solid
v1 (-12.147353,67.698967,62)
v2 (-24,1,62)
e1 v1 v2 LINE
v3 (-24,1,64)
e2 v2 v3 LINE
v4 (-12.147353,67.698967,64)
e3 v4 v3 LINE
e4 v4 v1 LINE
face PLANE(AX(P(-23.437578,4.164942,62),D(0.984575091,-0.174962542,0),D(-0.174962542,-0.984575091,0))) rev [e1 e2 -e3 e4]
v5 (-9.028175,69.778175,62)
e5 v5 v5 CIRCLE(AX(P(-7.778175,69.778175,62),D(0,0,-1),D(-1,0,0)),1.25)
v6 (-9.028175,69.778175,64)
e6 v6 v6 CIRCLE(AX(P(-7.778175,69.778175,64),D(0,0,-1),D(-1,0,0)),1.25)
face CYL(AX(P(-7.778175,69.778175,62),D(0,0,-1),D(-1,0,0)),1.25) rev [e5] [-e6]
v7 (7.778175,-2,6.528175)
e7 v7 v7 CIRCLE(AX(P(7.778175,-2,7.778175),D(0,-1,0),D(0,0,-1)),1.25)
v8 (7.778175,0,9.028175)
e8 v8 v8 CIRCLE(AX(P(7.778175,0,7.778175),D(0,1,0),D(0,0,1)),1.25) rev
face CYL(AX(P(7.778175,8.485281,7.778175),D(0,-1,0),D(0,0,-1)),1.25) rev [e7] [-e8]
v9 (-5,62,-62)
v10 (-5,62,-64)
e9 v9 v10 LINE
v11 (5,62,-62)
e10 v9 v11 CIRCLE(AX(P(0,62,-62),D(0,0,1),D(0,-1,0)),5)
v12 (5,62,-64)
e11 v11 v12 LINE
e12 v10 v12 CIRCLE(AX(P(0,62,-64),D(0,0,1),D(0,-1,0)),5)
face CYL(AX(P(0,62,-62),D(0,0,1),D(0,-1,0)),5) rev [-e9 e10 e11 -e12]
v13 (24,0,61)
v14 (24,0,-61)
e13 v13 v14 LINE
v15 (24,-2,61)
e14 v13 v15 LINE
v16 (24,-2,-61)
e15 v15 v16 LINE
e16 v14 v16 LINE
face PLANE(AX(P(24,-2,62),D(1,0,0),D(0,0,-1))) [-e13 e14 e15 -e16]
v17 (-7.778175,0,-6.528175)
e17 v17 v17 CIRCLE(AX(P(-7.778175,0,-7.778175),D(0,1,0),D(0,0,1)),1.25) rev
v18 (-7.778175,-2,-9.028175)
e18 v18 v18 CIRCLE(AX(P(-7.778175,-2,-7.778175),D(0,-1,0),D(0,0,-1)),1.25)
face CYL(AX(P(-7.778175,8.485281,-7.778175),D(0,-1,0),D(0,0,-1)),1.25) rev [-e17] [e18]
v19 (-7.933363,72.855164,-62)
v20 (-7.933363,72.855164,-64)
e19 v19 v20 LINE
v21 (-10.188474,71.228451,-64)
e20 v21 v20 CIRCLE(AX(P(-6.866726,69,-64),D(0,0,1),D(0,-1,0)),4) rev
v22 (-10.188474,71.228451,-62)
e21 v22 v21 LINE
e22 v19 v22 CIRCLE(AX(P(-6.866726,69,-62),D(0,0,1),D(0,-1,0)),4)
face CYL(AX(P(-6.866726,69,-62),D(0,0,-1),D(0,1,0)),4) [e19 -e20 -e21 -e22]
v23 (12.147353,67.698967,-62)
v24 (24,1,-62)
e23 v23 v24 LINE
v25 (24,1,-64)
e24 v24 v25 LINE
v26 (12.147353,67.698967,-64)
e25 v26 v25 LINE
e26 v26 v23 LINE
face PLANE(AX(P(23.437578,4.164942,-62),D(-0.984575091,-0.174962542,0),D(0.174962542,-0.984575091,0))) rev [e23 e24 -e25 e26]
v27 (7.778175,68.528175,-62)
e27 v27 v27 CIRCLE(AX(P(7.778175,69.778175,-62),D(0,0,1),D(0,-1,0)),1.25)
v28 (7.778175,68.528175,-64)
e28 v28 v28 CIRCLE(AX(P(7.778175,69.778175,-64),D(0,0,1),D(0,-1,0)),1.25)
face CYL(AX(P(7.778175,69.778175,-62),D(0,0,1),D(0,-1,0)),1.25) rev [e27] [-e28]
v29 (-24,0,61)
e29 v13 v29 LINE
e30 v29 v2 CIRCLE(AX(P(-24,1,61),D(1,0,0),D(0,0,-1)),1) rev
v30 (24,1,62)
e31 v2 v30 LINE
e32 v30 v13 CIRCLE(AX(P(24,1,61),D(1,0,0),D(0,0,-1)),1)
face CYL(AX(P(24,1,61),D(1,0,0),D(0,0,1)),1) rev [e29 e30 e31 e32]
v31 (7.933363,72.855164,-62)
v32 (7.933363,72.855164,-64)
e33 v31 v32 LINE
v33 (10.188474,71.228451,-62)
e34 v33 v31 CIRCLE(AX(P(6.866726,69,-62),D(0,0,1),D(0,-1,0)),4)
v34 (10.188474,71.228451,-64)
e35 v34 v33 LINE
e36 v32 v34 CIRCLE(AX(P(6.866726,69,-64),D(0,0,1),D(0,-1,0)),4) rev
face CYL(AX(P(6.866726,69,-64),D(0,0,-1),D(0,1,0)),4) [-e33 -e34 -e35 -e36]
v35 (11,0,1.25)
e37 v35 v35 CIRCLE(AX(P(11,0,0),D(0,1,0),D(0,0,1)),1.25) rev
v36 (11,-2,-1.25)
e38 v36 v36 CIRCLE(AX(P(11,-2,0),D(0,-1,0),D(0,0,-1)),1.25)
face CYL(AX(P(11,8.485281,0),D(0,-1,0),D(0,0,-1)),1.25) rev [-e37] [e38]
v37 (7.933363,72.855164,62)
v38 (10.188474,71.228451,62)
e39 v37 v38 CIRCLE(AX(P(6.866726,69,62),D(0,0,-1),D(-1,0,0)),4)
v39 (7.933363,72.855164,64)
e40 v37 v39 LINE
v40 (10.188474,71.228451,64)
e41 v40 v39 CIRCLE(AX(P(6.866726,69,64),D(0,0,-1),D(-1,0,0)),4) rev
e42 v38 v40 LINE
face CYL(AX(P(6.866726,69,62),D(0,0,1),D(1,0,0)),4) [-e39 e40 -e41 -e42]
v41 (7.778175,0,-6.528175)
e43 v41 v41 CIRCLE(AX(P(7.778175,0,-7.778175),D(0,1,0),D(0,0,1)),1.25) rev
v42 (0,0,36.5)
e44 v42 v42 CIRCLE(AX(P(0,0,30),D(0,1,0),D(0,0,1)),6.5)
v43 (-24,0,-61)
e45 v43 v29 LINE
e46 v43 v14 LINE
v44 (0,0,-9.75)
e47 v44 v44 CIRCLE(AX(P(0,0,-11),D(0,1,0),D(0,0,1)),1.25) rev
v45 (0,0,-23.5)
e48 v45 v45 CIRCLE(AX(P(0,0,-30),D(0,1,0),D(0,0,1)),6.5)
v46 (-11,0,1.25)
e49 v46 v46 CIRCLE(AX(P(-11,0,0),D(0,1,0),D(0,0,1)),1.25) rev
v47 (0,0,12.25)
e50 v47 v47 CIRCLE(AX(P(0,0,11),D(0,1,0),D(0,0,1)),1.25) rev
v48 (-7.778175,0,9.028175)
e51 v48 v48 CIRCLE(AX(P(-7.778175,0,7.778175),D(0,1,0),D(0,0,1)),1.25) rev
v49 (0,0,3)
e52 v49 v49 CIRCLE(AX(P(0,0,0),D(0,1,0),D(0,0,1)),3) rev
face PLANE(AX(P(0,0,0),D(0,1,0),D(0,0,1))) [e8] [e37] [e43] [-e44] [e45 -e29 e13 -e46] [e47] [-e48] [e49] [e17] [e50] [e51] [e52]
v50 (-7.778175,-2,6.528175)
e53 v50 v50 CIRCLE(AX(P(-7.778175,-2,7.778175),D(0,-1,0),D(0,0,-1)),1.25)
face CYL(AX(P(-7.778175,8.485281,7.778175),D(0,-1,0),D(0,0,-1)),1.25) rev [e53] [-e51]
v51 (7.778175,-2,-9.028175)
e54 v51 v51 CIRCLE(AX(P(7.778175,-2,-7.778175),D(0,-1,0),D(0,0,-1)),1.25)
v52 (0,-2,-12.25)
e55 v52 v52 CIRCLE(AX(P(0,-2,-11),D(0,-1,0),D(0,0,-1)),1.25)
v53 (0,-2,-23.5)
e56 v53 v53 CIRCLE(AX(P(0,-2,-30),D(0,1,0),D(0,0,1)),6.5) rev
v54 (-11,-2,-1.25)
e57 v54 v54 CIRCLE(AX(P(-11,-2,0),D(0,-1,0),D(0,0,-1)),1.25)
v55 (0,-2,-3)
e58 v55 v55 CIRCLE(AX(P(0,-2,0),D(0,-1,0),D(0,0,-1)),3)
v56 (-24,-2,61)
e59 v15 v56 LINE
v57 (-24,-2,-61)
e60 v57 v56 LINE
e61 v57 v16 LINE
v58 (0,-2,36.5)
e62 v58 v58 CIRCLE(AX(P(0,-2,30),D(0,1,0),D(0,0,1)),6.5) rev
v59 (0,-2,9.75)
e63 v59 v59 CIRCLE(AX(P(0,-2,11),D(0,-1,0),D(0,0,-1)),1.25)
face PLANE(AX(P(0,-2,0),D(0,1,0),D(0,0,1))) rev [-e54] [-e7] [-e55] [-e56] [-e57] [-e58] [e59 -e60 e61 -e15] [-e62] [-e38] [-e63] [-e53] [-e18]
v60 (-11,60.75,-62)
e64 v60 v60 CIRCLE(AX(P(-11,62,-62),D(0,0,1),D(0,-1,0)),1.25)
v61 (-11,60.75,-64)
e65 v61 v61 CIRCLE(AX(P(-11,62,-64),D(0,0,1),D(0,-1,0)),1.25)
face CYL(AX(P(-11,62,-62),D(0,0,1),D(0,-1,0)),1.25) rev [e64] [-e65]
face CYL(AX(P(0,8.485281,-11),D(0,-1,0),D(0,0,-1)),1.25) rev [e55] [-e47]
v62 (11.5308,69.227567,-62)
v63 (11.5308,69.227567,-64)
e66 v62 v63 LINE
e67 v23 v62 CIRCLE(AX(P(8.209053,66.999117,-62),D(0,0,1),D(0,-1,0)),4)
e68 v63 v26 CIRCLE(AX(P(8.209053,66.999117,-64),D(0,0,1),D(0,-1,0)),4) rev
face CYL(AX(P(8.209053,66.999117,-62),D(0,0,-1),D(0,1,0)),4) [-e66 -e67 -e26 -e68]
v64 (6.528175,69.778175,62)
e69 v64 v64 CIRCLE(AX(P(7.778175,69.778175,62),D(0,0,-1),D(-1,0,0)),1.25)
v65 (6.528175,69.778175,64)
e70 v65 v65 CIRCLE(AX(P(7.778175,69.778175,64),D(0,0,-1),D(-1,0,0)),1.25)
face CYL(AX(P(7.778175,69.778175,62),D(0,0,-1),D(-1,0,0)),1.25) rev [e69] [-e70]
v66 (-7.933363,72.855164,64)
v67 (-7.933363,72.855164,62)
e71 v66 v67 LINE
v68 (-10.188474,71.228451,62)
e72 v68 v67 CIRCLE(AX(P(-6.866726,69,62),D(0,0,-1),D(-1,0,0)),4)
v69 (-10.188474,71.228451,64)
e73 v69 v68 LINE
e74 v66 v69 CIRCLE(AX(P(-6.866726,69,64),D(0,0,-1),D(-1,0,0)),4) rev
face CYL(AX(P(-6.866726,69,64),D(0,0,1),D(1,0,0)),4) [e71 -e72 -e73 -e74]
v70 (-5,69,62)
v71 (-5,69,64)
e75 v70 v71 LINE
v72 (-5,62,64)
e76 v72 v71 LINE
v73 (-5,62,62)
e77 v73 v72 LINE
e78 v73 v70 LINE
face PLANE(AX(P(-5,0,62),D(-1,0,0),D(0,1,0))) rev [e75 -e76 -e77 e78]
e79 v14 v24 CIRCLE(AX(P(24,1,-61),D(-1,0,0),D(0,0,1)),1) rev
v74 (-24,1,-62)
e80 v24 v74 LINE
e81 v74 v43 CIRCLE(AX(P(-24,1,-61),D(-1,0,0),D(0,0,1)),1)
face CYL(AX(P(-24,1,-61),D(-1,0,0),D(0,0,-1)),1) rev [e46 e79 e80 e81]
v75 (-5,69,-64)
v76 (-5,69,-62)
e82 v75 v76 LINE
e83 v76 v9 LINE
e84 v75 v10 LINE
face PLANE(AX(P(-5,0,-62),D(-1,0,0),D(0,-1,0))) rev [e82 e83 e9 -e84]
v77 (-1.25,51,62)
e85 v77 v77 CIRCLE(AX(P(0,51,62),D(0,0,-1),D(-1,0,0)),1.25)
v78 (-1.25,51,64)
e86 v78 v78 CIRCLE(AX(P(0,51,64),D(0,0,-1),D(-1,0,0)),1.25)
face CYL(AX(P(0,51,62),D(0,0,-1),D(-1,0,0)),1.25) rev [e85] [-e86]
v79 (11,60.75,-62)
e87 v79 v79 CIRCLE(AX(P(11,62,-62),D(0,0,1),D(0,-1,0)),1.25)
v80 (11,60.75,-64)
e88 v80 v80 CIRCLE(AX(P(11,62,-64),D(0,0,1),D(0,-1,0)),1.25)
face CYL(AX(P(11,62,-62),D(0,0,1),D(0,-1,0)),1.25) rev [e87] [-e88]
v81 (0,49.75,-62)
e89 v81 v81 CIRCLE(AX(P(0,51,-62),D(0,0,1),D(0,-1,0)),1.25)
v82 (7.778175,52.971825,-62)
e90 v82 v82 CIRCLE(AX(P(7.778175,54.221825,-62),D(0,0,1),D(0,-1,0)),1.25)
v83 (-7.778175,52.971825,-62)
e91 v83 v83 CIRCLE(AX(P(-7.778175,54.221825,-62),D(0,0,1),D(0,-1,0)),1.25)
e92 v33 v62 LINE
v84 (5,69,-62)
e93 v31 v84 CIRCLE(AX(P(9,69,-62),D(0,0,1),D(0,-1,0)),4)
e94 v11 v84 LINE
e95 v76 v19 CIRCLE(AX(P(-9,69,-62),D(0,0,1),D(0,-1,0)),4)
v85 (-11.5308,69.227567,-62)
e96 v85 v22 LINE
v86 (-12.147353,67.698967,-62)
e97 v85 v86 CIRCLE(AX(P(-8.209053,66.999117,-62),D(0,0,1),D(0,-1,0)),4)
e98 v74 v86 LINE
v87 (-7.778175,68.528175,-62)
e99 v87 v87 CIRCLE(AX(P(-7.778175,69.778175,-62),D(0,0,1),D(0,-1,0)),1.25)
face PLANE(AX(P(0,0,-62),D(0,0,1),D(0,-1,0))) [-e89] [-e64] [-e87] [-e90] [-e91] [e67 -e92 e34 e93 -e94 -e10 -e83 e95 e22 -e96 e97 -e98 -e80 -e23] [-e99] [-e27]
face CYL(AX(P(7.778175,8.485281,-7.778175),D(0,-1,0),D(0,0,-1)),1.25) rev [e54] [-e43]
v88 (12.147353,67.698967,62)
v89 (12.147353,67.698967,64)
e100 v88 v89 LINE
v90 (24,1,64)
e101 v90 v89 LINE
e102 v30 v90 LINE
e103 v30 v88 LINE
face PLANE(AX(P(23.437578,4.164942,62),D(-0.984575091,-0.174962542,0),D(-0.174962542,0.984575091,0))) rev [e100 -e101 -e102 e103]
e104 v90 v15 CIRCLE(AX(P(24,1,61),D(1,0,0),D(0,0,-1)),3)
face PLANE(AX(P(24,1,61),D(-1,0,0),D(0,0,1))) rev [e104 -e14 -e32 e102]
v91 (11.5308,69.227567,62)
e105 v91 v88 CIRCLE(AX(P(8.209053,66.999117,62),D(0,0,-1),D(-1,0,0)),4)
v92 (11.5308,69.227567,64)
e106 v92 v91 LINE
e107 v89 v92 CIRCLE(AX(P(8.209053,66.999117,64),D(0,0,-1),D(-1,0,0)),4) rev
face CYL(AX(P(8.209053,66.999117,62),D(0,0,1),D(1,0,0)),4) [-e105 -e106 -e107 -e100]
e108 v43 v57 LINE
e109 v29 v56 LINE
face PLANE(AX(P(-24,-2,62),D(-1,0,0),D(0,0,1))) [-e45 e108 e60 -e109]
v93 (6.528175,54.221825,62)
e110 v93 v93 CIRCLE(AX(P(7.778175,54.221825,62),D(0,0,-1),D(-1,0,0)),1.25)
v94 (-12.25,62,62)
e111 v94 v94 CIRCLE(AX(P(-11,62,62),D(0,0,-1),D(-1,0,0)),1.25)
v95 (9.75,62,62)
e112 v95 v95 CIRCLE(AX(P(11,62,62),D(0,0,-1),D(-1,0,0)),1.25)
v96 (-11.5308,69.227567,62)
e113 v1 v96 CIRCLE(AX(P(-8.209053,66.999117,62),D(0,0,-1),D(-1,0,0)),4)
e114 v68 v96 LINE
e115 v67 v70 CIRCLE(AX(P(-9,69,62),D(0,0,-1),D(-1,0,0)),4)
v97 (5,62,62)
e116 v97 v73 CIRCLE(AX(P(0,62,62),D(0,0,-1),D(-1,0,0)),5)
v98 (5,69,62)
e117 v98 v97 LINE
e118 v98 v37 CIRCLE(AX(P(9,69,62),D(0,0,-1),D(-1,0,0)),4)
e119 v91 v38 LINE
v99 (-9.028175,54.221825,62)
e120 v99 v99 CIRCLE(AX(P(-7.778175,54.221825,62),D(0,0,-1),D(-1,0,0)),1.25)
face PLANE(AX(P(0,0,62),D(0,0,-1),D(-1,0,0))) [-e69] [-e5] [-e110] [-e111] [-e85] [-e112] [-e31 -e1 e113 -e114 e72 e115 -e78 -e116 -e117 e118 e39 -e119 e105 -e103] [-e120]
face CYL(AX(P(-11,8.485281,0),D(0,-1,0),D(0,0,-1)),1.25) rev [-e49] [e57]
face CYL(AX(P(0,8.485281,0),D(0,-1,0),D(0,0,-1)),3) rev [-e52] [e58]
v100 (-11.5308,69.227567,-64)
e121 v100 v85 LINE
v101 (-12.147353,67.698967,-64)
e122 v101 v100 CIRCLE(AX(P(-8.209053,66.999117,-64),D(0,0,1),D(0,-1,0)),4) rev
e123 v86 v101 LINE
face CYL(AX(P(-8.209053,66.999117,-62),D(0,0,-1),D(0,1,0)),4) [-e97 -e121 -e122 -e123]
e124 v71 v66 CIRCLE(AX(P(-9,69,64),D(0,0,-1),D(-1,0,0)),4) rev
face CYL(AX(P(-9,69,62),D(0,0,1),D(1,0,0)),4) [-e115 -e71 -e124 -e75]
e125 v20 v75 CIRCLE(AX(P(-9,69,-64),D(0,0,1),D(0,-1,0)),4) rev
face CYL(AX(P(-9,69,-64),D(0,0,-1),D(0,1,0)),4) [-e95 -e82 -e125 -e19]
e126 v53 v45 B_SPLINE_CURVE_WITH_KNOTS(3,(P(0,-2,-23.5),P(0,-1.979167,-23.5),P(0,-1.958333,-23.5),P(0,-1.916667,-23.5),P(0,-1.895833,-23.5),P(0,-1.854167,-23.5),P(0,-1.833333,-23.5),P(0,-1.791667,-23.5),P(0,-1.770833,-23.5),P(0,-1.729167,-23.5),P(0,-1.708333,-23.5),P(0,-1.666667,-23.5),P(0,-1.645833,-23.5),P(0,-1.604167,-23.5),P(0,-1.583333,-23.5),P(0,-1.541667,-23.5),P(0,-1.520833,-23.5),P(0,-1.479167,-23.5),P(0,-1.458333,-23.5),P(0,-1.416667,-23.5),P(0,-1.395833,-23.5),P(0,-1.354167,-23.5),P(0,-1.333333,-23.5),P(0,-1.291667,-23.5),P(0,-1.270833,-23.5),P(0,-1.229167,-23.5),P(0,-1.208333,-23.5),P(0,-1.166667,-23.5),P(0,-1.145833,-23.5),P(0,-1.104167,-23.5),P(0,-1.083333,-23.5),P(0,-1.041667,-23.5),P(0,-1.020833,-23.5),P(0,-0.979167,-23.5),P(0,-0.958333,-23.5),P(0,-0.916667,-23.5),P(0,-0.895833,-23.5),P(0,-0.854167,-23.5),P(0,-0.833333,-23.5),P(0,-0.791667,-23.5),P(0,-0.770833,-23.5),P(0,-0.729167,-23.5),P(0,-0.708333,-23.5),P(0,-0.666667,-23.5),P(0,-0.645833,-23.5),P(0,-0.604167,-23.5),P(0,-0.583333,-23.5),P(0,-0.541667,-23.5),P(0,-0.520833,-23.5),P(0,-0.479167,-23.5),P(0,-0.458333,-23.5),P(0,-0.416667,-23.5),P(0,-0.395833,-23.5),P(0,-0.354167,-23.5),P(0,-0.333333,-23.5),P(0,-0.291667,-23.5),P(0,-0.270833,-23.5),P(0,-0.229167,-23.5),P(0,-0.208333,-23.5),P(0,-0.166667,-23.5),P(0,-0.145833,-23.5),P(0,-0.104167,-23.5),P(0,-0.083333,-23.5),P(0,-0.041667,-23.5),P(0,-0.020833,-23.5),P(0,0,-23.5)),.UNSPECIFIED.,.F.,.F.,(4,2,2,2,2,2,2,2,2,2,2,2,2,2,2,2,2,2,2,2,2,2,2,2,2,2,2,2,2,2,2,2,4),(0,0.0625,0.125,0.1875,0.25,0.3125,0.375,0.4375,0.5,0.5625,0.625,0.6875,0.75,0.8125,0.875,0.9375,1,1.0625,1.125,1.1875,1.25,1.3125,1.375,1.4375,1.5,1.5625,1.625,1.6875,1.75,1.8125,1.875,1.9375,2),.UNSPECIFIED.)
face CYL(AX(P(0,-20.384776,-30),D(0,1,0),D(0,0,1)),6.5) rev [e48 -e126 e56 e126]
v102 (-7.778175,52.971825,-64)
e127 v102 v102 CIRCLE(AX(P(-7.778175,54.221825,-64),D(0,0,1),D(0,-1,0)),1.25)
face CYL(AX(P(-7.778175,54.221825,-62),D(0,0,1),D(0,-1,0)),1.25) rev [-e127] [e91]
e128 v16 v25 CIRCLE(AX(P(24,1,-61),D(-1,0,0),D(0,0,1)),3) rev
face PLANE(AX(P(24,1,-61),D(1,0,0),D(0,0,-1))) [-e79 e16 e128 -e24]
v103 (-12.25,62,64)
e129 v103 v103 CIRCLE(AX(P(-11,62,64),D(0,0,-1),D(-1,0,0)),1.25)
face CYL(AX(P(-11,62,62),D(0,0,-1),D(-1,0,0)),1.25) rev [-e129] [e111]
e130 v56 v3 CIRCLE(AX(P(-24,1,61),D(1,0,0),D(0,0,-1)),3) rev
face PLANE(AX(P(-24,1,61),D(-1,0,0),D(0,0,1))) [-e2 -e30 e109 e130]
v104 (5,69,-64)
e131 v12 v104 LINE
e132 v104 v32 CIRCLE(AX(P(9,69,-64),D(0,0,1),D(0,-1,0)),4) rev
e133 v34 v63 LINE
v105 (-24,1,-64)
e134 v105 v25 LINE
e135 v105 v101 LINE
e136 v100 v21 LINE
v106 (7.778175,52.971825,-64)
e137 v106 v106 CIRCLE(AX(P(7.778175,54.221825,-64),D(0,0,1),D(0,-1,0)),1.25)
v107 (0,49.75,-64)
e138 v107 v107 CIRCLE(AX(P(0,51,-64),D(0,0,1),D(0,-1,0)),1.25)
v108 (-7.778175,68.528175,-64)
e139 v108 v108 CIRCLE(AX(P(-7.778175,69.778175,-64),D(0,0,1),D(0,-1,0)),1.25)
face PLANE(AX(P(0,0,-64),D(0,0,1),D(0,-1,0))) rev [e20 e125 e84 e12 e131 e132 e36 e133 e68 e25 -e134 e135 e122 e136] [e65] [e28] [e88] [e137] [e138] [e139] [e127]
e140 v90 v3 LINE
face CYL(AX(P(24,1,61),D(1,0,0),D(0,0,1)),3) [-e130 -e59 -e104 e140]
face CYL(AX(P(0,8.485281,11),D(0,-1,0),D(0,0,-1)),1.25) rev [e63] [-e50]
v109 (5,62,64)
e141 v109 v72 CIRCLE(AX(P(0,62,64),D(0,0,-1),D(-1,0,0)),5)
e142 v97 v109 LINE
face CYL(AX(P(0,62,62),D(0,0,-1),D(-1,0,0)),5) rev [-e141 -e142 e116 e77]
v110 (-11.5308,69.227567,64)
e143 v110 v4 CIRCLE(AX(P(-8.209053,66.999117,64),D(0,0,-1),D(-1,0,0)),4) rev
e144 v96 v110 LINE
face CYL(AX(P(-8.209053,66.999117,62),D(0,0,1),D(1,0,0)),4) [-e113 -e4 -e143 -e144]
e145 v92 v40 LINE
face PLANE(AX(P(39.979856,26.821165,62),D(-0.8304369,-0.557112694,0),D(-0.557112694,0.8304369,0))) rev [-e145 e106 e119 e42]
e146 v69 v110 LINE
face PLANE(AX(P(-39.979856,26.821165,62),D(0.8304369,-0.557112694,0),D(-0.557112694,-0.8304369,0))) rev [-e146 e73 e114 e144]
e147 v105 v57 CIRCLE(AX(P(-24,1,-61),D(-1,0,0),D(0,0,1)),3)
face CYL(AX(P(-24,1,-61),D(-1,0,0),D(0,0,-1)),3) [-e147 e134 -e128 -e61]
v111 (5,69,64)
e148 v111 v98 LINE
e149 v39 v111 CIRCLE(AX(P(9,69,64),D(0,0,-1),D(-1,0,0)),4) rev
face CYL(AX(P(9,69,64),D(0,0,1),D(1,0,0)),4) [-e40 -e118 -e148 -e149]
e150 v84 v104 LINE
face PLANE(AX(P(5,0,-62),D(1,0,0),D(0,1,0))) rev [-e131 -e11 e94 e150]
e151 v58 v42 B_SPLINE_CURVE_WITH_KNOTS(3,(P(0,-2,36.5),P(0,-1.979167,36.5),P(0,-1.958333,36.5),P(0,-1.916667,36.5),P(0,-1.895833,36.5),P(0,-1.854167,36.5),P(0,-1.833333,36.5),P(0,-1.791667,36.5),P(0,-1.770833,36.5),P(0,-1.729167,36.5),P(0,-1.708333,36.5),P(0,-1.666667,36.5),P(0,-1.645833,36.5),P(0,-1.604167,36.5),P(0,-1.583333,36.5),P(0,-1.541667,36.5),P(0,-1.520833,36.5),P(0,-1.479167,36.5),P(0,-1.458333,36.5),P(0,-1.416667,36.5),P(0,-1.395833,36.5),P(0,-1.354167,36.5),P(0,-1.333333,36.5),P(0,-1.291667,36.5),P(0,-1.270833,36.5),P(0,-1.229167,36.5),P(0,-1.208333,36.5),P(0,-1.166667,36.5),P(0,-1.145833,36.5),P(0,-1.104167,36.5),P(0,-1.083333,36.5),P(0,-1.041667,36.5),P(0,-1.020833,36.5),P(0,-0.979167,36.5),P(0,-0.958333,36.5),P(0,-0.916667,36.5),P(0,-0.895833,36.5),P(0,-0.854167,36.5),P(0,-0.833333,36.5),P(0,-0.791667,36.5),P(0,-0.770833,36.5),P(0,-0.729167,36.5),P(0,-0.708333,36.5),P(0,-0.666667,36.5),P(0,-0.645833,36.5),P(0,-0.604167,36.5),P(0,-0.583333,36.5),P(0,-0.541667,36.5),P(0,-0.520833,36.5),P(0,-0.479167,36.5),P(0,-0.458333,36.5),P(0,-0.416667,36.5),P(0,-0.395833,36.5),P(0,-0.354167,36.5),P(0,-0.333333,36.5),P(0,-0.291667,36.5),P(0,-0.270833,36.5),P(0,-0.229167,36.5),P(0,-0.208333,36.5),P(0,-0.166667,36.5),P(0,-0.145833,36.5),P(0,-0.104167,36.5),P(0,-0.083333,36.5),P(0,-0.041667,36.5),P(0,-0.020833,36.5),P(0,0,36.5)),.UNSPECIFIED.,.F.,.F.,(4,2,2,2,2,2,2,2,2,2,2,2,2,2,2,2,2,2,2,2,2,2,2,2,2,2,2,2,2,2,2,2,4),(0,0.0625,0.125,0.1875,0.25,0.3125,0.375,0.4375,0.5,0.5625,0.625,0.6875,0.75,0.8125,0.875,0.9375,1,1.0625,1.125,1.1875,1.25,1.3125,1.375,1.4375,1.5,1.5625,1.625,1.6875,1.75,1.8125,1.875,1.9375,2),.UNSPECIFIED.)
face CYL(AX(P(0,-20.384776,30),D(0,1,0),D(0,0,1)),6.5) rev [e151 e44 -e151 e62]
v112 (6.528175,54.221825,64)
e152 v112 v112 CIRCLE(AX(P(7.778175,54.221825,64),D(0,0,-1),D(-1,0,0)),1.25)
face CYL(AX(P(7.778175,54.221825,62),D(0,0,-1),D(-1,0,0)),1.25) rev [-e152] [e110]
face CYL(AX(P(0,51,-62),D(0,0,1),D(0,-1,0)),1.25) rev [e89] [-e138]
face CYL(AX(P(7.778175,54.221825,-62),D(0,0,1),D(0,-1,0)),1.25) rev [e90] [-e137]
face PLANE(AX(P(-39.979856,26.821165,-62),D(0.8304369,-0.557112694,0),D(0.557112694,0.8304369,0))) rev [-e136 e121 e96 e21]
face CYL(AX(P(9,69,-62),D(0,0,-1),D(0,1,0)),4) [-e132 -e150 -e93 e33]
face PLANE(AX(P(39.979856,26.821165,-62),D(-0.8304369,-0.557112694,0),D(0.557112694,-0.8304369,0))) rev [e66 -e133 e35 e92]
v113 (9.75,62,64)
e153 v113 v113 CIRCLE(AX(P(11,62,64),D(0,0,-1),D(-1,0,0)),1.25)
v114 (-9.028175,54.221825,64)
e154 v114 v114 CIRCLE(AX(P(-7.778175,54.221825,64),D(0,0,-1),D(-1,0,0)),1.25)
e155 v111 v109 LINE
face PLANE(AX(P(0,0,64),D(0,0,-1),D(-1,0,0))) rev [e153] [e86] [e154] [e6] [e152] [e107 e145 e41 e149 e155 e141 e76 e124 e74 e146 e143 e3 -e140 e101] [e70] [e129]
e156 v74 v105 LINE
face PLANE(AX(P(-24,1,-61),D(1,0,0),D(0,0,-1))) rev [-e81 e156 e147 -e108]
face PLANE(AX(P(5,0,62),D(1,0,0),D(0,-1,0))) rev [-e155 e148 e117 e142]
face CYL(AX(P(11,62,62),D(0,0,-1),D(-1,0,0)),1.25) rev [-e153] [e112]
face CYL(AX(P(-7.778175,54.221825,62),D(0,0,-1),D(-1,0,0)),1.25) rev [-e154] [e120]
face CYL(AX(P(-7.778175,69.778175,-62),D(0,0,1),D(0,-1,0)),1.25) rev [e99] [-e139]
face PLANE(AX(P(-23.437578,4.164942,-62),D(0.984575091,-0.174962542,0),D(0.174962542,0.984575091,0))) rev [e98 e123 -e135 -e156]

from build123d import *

# Parameters (mm, degrees)
ESBO_O1_W                        = 48
ESBO_O1_H                        = 124
FLANGE_BASE1_DEPTH               = 2
ARESTA_FLANGE1_STRIP_W           = 10
ARESTA_FLANGE1_STRIP_H           = 2
ARESTA_FLANGE1_STRIP_CUT_DEPTH   = 48
ARESTA_FLANGE1_STRIP_2_W         = 10
ARESTA_FLANGE1_STRIP_2_H         = 2
ARESTA_FLANGE1_STRIP_CUT_2_DEPTH = 48
ARESTA_FLANGE1_DEPTH             = 48
ARESTA_FLANGE1_BEND_DEPTH        = 48
CORTE_EXTRUS_O1_REACH            = 151.295
ESBO_O14_R                       = 1.25
ESBO_O15_R                       = 6.5
CORTE_EXTRUS_O2_DEPTH            = 2
FILETE1_R                        = 4
ESBO_O16_R                       = 3
ESBO_O16_R_2                     = 1.25
CORTE_EXTRUS_O3_DEPTH            = 2


# Sheet-metal steps are written as plain solids
with BuildPart() as part:
    # Esboço1 → Flange-base1 (new body)
    with BuildSketch(Plane(origin=(0, 0, 0), x_dir=(1, 0, 0), z_dir=(0, 1, 0))):
        Rectangle(ESBO_O1_W, ESBO_O1_H)
    extrude(amount=-FLANGE_BASE1_DEPTH)

    # Aresta-Flange1 strip (across the edge) → Aresta-Flange1 strip cut (cut)
    with BuildSketch(Plane(origin=(-24, 0, 62), x_dir=(0, 0, -1), z_dir=(1, 0, 0))):
        with Locations((-4, -1)):
            Rectangle(ARESTA_FLANGE1_STRIP_W, ARESTA_FLANGE1_STRIP_H)
    extrude(amount=ARESTA_FLANGE1_STRIP_CUT_DEPTH, mode=Mode.SUBTRACT)

    # Aresta-Flange1 strip 2 (across the edge) → Aresta-Flange1 strip cut 2 (cut)
    with BuildSketch(Plane(origin=(24, 0, -62), x_dir=(0, 0, 1), z_dir=(-1, 0, 0))):
        with Locations((-4, -1)):
            Rectangle(ARESTA_FLANGE1_STRIP_2_W, ARESTA_FLANGE1_STRIP_2_H)
    extrude(amount=ARESTA_FLANGE1_STRIP_CUT_2_DEPTH, mode=Mode.SUBTRACT)

    # Aresta-Flange1 section (across the edge) → Aresta-Flange1 (add)
    with BuildSketch(Plane(origin=(-24, 0, 62), x_dir=(0, 0, -1), z_dir=(1, 0, 0))):
        with BuildLine():
            Line((-2, 1), (-2, 73))
            Line((-2, 73), (0, 73))
            Line((0, 73), (0, 1))
            ThreePointArc((0, 1), (0.292893219, 0.292893219), (1, 0))
            Line((1, 0), (1, -2))
            ThreePointArc((1, -2), (-1.121320344, -1.121320344), (-2, 1))
        make_face()
    extrude(amount=ARESTA_FLANGE1_DEPTH)

    # Aresta-Flange1 section 2 (across the edge) → Aresta-Flange1 bend (add)
    with BuildSketch(Plane(origin=(24, 0, -62), x_dir=(0, 0, 1), z_dir=(-1, 0, 0))):
        with BuildLine():
            Line((-2, 1), (-2, 73))
            Line((-2, 73), (0, 73))
            Line((0, 73), (0, 1))
            ThreePointArc((0, 1), (0.292893219, 0.292893219), (1, 0))
            Line((1, 0), (1, -2))
            ThreePointArc((1, -2), (-1.121320344, -1.121320344), (-2, 1))
        make_face()
    extrude(amount=ARESTA_FLANGE1_BEND_DEPTH)

    # Corte-extrusão1: up to this face of the body (flat: up to its plane)
    corte_extrus_o1_end = Plane(part.part.faces().sort_by_distance((0, 37, -64))[0])
    # Esboço14 → Corte-extrusão1 (cut, up to the picked face)
    with BuildSketch(Plane.XY.offset(64), mode=Mode.PRIVATE) as corte_extrus_o1_sk1:
        with Locations(Location((-11, 62, 0), (0, 0, 180))):
            Circle(ESBO_O14_R)
    corte_extrus_o1_tool1 = split(extrude(corte_extrus_o1_sk1.sketch, amount=-CORTE_EXTRUS_O1_REACH, mode=Mode.PRIVATE), bisect_by=corte_extrus_o1_end, keep=Keep.BOTH, mode=Mode.PRIVATE)
    # Esboço14 → Corte-extrusão1 (cut, up to the picked face)
    with BuildSketch(Plane.XY.offset(64), mode=Mode.PRIVATE) as corte_extrus_o1_sk2:
        with Locations(Location((-7.778174593, 69.778174593, 0), (0, 0, 270))):
            Circle(ESBO_O14_R)
    corte_extrus_o1_tool2 = split(extrude(corte_extrus_o1_sk2.sketch, amount=-CORTE_EXTRUS_O1_REACH, mode=Mode.PRIVATE), bisect_by=corte_extrus_o1_end, keep=Keep.BOTH, mode=Mode.PRIVATE)
    # Esboço14 → Corte-extrusão1 (cut, up to the picked face)
    with BuildSketch(Plane.XY.offset(64), mode=Mode.PRIVATE) as corte_extrus_o1_sk3:
        with Locations(Location((7.778174593, 69.778174593, 0), (0, 0, 270))):
            Circle(ESBO_O14_R)
    corte_extrus_o1_tool3 = split(extrude(corte_extrus_o1_sk3.sketch, amount=-CORTE_EXTRUS_O1_REACH, mode=Mode.PRIVATE), bisect_by=corte_extrus_o1_end, keep=Keep.BOTH, mode=Mode.PRIVATE)
    # Esboço14 → Corte-extrusão1 (cut, up to the picked face)
    with BuildSketch(Plane.XY.offset(64), mode=Mode.PRIVATE) as corte_extrus_o1_sk4:
        with Locations(Location((11, 62, 0), (0, 0, 270))):
            Circle(ESBO_O14_R)
    corte_extrus_o1_tool4 = split(extrude(corte_extrus_o1_sk4.sketch, amount=-CORTE_EXTRUS_O1_REACH, mode=Mode.PRIVATE), bisect_by=corte_extrus_o1_end, keep=Keep.BOTH, mode=Mode.PRIVATE)
    # Esboço14 → Corte-extrusão1 (cut, up to the picked face)
    with BuildSketch(Plane.XY.offset(64), mode=Mode.PRIVATE) as corte_extrus_o1_sk5:
        with Locations(Location((7.778174593, 54.221825407, 0), (0, 0, 270))):
            Circle(ESBO_O14_R)
    corte_extrus_o1_tool5 = split(extrude(corte_extrus_o1_sk5.sketch, amount=-CORTE_EXTRUS_O1_REACH, mode=Mode.PRIVATE), bisect_by=corte_extrus_o1_end, keep=Keep.BOTH, mode=Mode.PRIVATE)
    # Esboço14 → Corte-extrusão1 (cut, up to the picked face)
    with BuildSketch(Plane.XY.offset(64), mode=Mode.PRIVATE) as corte_extrus_o1_sk6:
        with Locations(Location((0, 51, 0), (0, 0, 270))):
            Circle(ESBO_O14_R)
    corte_extrus_o1_tool6 = split(extrude(corte_extrus_o1_sk6.sketch, amount=-CORTE_EXTRUS_O1_REACH, mode=Mode.PRIVATE), bisect_by=corte_extrus_o1_end, keep=Keep.BOTH, mode=Mode.PRIVATE)
    # Esboço14 → Corte-extrusão1 (cut, up to the picked face)
    with BuildSketch(Plane.XY.offset(64), mode=Mode.PRIVATE) as corte_extrus_o1_sk7:
        with Locations(Location((-7.778174593, 54.221825407, 0), (0, 0, 270))):
            Circle(ESBO_O14_R)
    corte_extrus_o1_tool7 = split(extrude(corte_extrus_o1_sk7.sketch, amount=-CORTE_EXTRUS_O1_REACH, mode=Mode.PRIVATE), bisect_by=corte_extrus_o1_end, keep=Keep.BOTH, mode=Mode.PRIVATE)
    # Esboço14 → Corte-extrusão1 (cut, up to the picked face)
    with BuildSketch(Plane.XY.offset(64), mode=Mode.PRIVATE) as corte_extrus_o1_sk8:
        with BuildLine():
            Line((-5, 62), (-5, 73))
            Line((-5, 73), (5, 73))
            Line((5, 73), (5, 62))
            ThreePointArc((5, 62), (0, 57), (-5, 62))
        make_face()
    corte_extrus_o1_tool8 = split(extrude(corte_extrus_o1_sk8.sketch, amount=-CORTE_EXTRUS_O1_REACH, mode=Mode.PRIVATE), bisect_by=corte_extrus_o1_end, keep=Keep.BOTH, mode=Mode.PRIVATE)
    # Esboço14 → Corte-extrusão1 (cut, up to the picked face)
    with BuildSketch(Plane.XY.offset(64), mode=Mode.PRIVATE) as corte_extrus_o1_sk9:
        Polygon((-24, 1), (-12, 68.528174593), (-9, 73), (-24, 73), align=None)
    corte_extrus_o1_tool9 = split(extrude(corte_extrus_o1_sk9.sketch, amount=-CORTE_EXTRUS_O1_REACH, mode=Mode.PRIVATE), bisect_by=corte_extrus_o1_end, keep=Keep.BOTH, mode=Mode.PRIVATE)
    # Esboço14 → Corte-extrusão1 (cut, up to the picked face)
    with BuildSketch(Plane.XY.offset(64), mode=Mode.PRIVATE) as corte_extrus_o1_sk10:
        Polygon((24, 73), (9, 73), (12, 68.528174593), (24, 1), align=None)
    corte_extrus_o1_tool10 = split(extrude(corte_extrus_o1_sk10.sketch, amount=-CORTE_EXTRUS_O1_REACH, mode=Mode.PRIVATE), bisect_by=corte_extrus_o1_end, keep=Keep.BOTH, mode=Mode.PRIVATE)
    add(corte_extrus_o1_tool1.solids().sort_by(Axis((-11, 62, 64), (0, 0, -1)))[0], mode=Mode.SUBTRACT)
    add(corte_extrus_o1_tool2.solids().sort_by(Axis((-7.778175, 69.778175, 64), (0, 0, -1)))[0], mode=Mode.SUBTRACT)
    add(corte_extrus_o1_tool3.solids().sort_by(Axis((7.778175, 69.778175, 64), (0, 0, -1)))[0], mode=Mode.SUBTRACT)
    add(corte_extrus_o1_tool4.solids().sort_by(Axis((11, 62, 64), (0, 0, -1)))[0], mode=Mode.SUBTRACT)
    add(corte_extrus_o1_tool5.solids().sort_by(Axis((7.778175, 54.221825, 64), (0, 0, -1)))[0], mode=Mode.SUBTRACT)
    add(corte_extrus_o1_tool6.solids().sort_by(Axis((0, 51, 64), (0, 0, -1)))[0], mode=Mode.SUBTRACT)
    add(corte_extrus_o1_tool7.solids().sort_by(Axis((-7.778175, 54.221825, 64), (0, 0, -1)))[0], mode=Mode.SUBTRACT)
    add(corte_extrus_o1_tool8.solids().sort_by(Axis((0, 65.494788, 64), (0, 0, -1)))[0], mode=Mode.SUBTRACT)
    add(corte_extrus_o1_tool9.solids().sort_by(Axis((-19.639786, 49.238418, 64), (0, 0, -1)))[0], mode=Mode.SUBTRACT)
    add(corte_extrus_o1_tool10.solids().sort_by(Axis((19.639786, 49.238418, 64), (0, 0, -1)))[0], mode=Mode.SUBTRACT)

    # Esboço15 → Corte-extrusão2 (cut)
    with BuildSketch(Plane(origin=(0, 0, 0), x_dir=(1, 0, 0), z_dir=(0, 1, 0))):
        with Locations(Location((0, -30, 0), (0, 0, 270))):
            Circle(ESBO_O15_R)
        with Locations(Location((0, 30, 0), (0, 0, 270))):
            Circle(ESBO_O15_R)
    extrude(amount=-CORTE_EXTRUS_O2_DEPTH, mode=Mode.SUBTRACT)

    # Filete1
    # the kernel refuses this fillet: 4 mm, written as the material it takes off along each edge
    with BuildSketch(Plane(origin=(-12, 68.528174593, -59.894503429), x_dir=(-0.17496254204261552, -0.9845750905248344, 0), z_dir=(0, 0, -1)), Plane(origin=(-12, 68.528174593, 66.105496571), x_dir=(-0.17496254204261552, -0.9845750905248344, 0), z_dir=(0, 0, -1))) as filete1_piece_1:
        with BuildLine():
            CenterArc((FILETE1_R * 0.210549657125, -FILETE1_R), FILETE1_R, 90, 23.779877271)
            Line((-FILETE1_R * 0.192674273309, -FILETE1_R * 0.0848986602977), (0, 0))
            Line((0, 0), (FILETE1_R * 0.210549657125, 0))
        make_face()
    extrude(amount=6.210993143, mode=Mode.SUBTRACT)
    with BuildSketch(Plane(origin=(-9, 73, -56.666815681), x_dir=(1, 0, 0), z_dir=(0, 0, -1)), Plane(origin=(9, 73, -56.666815681), x_dir=(0.5571126944302854, -0.8304369004955329, 0), z_dir=(0, 0, -1)), Plane(origin=(9, 73, 69.333184319), x_dir=(0.5571126944302854, -0.8304369004955329, 0), z_dir=(0, 0, -1))) as filete1_piece_2:
        with BuildLine():
            CenterArc((FILETE1_R * 0.533318431907, FILETE1_R), FILETE1_R, 213.856355566, 56.143644434)
            Line((-FILETE1_R * 0.297118468589, FILETE1_R * 0.44288730557), (0, 0))
            Line((0, 0), (FILETE1_R * 0.533318431907, 0))
        make_face()
    extrude(amount=12.666368638, mode=Mode.SUBTRACT)
    with BuildSketch(Plane(origin=(-5, 73, -52), x_dir=(0, -1, 0), z_dir=(0, 0, -1)), Plane(origin=(5, 73, -52), x_dir=(1, 0, 0), z_dir=(0, 0, -1)), Plane(origin=(5, 73, 74), x_dir=(1, 0, 0), z_dir=(0, 0, -1)), Plane(origin=(-5, 73, 74), x_dir=(0, -1, 0), z_dir=(0, 0, -1))) as filete1_piece_3:
        with BuildLine():
            CenterArc((FILETE1_R, FILETE1_R), FILETE1_R, 180, 90)
            Line((0, FILETE1_R), (0, 0))
            Line((0, 0), (FILETE1_R, 0))
        make_face()
    extrude(amount=22, mode=Mode.SUBTRACT)
    with BuildSketch(Plane(origin=(12, 68.528174593, -59.894503429), x_dir=(0.17496254204261671, -0.9845750905248343, 0), z_dir=(0, 0, -1)), Plane(origin=(12, 68.528174593, 66.105496571), x_dir=(0.17496254204261671, -0.9845750905248343, 0), z_dir=(0, 0, -1))) as filete1_piece_4:
        with BuildLine():
            CenterArc((FILETE1_R * 0.210549657125, FILETE1_R), FILETE1_R, 246.220122729, 23.779877271)
            Line((-FILETE1_R * 0.192674273309, FILETE1_R * 0.0848986602977), (0, 0))
            Line((0, 0), (FILETE1_R * 0.210549657125, 0))
        make_face()
    extrude(amount=6.210993143, mode=Mode.SUBTRACT)
    with BuildSketch(Plane(origin=(-9, 73, 69.333184319), x_dir=(-0.5571126944302854, -0.8304369004955329, 0), z_dir=(0, 0, -1))) as filete1_piece_5:
        with BuildLine():
            CenterArc((FILETE1_R * 0.533318431907, -FILETE1_R), FILETE1_R, 90, 56.143644434)
            Line((-FILETE1_R * 0.297118468589, -FILETE1_R * 0.44288730557), (0, 0))
            Line((0, 0), (FILETE1_R * 0.533318431907, 0))
        make_face()
    extrude(amount=12.666368638, mode=Mode.SUBTRACT)

    # Esboço16 → Corte-extrusão3 (cut)
    with BuildSketch(Plane.XZ.offset(2)):
        with Locations(Location((0, 0, 0), (0, 0, 270))):
            Circle(ESBO_O16_R)
        with Locations(Location((0, 11, 0), (0, 0, 270))):
            Circle(ESBO_O16_R_2)
        with Locations(Location((7.778174593, 7.778174593, 0), (0, 0, 270))):
            Circle(ESBO_O16_R_2)
        with Locations(Location((11, 0, 0), (0, 0, 270))):
            Circle(ESBO_O16_R_2)
        with Locations(Location((7.778174593, -7.778174593, 0), (0, 0, 270))):
            Circle(ESBO_O16_R_2)
        with Locations(Location((0, -11, 0), (0, 0, 270))):
            Circle(ESBO_O16_R_2)
        with Locations(Location((-7.778174593, -7.778174593, 0), (0, 0, 270))):
            Circle(ESBO_O16_R_2)
        with Locations(Location((-11, 0, 0), (0, 0, 270))):
            Circle(ESBO_O16_R_2)
        with Locations(Location((-7.778174593, 7.778174593, 0), (0, 0, 270))):
            Circle(ESBO_O16_R_2)
    extrude(amount=-CORTE_EXTRUS_O3_DEPTH, mode=Mode.SUBTRACT)


solid = part.part
